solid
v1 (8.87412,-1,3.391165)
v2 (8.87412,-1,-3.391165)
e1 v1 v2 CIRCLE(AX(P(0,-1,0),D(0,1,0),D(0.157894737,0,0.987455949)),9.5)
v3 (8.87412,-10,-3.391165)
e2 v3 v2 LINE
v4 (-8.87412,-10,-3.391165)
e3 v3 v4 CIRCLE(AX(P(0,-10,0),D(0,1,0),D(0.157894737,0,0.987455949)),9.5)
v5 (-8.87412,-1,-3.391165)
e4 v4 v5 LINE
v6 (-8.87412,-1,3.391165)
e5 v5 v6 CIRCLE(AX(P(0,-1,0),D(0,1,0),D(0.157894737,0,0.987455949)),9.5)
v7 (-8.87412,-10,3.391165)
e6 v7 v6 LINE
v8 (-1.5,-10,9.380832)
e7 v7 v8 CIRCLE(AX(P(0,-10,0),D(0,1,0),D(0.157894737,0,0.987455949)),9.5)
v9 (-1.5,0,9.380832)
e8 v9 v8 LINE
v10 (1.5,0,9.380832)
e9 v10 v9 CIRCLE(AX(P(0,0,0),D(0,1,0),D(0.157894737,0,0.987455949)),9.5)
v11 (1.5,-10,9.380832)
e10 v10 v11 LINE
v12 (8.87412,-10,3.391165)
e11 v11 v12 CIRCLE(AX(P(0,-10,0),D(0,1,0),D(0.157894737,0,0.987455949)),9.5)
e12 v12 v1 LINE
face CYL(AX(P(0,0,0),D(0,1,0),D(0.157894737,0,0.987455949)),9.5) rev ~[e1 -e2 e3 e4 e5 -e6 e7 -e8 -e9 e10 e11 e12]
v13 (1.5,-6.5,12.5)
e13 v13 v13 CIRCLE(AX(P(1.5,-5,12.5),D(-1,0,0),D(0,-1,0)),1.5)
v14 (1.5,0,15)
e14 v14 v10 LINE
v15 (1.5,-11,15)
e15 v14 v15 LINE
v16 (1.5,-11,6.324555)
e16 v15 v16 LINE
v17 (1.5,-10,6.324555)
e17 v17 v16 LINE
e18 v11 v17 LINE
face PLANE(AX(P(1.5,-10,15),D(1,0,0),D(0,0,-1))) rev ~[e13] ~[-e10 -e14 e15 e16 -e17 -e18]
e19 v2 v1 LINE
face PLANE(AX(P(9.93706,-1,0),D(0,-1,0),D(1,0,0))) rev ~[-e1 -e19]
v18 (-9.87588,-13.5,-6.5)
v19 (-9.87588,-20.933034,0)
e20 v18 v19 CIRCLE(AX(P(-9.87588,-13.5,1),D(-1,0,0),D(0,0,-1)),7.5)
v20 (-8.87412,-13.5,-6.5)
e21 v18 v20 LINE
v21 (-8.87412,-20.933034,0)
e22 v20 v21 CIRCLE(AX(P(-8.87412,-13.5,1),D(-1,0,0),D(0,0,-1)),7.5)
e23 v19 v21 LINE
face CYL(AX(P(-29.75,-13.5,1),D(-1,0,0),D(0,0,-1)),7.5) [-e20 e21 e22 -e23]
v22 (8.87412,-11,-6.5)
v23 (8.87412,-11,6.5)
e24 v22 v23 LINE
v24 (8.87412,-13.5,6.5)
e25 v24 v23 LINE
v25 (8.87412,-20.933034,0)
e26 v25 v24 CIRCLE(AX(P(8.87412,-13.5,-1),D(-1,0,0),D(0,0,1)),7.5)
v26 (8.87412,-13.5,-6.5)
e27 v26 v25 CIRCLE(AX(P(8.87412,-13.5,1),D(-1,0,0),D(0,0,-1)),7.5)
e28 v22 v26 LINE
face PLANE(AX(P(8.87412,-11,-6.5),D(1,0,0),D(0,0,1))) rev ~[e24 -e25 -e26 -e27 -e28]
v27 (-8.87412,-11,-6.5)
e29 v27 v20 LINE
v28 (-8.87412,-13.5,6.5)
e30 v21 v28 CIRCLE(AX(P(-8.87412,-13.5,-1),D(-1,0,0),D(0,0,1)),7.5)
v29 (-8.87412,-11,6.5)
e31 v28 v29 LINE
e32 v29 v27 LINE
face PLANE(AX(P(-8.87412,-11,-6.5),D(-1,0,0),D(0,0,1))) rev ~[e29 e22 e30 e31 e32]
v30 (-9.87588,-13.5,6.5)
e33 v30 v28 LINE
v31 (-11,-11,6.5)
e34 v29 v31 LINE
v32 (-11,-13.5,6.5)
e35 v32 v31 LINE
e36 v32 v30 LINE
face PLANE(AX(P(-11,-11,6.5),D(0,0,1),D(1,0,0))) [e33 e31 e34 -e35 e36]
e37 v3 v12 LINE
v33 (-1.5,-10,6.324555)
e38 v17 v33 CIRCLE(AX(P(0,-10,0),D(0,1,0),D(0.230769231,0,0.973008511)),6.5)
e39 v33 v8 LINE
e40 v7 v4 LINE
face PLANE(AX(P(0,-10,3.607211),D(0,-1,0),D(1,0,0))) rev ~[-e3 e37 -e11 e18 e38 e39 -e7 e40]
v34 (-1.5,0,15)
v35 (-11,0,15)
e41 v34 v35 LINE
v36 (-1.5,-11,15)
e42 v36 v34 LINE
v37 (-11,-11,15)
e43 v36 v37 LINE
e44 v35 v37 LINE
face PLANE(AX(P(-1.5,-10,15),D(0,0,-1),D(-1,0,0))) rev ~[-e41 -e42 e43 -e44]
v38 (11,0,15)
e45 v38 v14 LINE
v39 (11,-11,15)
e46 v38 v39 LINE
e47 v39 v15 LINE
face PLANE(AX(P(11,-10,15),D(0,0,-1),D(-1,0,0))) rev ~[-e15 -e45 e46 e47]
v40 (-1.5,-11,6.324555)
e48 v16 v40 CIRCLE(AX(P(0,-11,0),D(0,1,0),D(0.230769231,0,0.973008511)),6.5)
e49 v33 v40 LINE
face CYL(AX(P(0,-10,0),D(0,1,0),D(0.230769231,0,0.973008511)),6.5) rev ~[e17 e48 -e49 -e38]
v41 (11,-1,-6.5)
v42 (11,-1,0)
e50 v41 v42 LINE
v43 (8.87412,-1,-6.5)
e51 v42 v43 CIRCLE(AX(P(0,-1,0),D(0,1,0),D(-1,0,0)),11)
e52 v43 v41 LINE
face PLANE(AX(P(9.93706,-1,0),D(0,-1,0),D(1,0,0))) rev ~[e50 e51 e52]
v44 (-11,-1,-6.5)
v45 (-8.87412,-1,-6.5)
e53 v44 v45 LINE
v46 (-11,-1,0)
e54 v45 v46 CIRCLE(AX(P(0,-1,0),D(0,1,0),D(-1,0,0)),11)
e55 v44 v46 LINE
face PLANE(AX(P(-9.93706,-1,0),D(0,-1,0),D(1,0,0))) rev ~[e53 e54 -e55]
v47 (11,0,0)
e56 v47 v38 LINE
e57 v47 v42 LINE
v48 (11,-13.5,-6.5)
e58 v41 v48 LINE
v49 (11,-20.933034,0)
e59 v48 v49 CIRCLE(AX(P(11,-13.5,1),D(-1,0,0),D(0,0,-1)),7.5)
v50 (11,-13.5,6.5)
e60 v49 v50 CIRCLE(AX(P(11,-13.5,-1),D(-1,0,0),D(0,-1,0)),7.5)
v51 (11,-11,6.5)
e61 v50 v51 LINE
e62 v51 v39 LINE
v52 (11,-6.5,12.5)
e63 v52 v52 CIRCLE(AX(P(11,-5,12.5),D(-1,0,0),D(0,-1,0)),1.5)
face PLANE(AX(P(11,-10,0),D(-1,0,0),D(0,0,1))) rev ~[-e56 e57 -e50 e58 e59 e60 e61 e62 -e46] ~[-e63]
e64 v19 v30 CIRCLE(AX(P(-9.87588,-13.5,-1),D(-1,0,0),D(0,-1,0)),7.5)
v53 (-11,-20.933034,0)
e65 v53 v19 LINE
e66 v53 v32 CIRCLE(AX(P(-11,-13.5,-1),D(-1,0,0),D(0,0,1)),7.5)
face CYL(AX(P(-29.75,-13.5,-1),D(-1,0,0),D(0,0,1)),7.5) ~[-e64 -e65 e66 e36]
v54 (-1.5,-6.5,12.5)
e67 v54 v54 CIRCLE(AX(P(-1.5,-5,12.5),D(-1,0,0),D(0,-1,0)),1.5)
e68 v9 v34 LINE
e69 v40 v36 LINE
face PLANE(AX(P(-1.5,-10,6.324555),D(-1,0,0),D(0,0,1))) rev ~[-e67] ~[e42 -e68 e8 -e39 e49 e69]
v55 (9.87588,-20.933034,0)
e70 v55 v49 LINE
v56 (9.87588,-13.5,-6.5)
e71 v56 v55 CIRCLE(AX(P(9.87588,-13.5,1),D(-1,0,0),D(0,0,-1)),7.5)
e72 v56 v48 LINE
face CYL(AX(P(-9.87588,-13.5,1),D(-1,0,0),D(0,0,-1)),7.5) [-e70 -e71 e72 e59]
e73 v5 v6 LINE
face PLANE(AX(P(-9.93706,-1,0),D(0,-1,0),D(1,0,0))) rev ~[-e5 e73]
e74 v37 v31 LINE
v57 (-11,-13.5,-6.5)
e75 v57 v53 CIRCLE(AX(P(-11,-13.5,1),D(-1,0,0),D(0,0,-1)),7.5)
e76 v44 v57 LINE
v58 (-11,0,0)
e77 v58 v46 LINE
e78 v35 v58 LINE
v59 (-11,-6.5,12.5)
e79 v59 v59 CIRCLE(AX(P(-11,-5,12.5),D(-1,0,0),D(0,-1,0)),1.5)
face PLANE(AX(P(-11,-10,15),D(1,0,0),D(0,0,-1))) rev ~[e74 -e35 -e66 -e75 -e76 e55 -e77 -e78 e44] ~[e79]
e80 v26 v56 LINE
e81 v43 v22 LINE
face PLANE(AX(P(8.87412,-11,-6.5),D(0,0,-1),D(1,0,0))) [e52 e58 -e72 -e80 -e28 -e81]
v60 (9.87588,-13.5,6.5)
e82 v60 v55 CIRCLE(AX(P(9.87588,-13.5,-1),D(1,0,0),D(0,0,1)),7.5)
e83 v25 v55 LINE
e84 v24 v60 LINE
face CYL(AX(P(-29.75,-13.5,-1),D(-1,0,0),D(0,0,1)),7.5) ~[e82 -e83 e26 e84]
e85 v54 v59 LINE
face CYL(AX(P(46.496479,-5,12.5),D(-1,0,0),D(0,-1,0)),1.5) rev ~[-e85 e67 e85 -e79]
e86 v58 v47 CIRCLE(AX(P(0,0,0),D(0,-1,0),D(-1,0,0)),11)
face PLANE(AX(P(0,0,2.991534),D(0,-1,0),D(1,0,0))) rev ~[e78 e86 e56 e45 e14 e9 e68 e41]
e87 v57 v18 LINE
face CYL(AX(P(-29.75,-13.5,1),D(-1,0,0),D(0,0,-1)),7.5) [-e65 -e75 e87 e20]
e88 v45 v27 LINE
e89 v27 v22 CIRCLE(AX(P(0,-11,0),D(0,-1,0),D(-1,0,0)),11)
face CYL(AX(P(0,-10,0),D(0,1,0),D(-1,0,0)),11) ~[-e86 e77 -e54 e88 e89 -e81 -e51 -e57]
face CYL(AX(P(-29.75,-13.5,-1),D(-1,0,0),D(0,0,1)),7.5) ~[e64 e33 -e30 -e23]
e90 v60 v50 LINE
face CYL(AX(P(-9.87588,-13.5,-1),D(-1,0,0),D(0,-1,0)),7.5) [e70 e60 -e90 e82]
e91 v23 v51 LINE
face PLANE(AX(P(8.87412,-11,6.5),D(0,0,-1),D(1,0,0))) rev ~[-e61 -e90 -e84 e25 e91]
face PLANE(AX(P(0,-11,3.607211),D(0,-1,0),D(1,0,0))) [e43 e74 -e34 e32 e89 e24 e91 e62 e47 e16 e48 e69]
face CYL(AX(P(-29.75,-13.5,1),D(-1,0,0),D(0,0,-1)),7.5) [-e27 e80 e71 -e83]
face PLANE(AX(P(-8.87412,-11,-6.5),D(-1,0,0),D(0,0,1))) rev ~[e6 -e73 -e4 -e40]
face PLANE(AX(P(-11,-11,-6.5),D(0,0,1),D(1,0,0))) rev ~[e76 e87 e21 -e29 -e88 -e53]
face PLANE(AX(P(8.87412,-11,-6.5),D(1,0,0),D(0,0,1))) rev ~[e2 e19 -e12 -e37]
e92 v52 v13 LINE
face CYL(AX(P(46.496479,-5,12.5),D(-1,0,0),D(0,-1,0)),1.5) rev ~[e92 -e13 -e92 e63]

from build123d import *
from build123d import SkipClean  # not in build123d's __all__

# Parameters (mm, degrees)
F1_DEPTH    = 10
F3_D        = 3
F5_DEPTH    = 1
F6_W        = 2.1258803254
F6_H        = 13
F7_DEPTH    = 10
F8_T1_DEPTH = 39.6258803254
F8_T3_DEPTH = 39.6258803254


# Not quite as in the source:
# - a fillet or chamfer that OpenCascade refuses, or shapes differently, is made with other operations: its cross-section is extruded or revolved along the edge and cut away or added


with BuildPart() as f1:
    # F0 (on Front) → F1 (new body)
    with BuildSketch(Plane.XZ):
        with BuildLine():
            ThreePointArc((1.5, 9.3808315196), (0, -9.5), (-1.5, 9.3808315196))
            Line((-1.5, 9.3808315196), (-1.5, 15))
            Line((-1.5, 15), (-11, 15))
            Line((-11, 15), (-11, 0))
            ThreePointArc((-11, 0), (0, -11), (11, 0))
            Line((11, 0), (11, 15))
            Line((11, 15), (1.5, 15))
            Line((1.5, 15), (1.5, 9.3808315196))
        make_face()
    extrude(amount=F1_DEPTH)

    # F3 (through all)
    with Locations(Plane.YZ.offset(11)):
        with Locations((-5, 12.5)):
            Hole(F3_D / 2)

    # F4 (on face) → F5 (join)
    with BuildSketch(Plane.XZ.offset(10)):
        with BuildLine():
            Line((-1.5, 15), (-11, 15))
            Line((-11, 15), (-11, 0))
            ThreePointArc((-11, 0), (0, -11), (11, 0))
            Line((11, 0), (11, 15))
            Line((11, 15), (1.5, 15))
            Line((1.5, 15), (1.5, 6.3245553203))
            ThreePointArc((1.5, 6.3245553203), (0, -6.5), (-1.5, 6.3245553203))
            Line((-1.5, 6.3245553203), (-1.5, 15))
        make_face()
    extrude(amount=F5_DEPTH)

    # F6 (on face) → F7 (join, symmetric)
    with BuildSketch(Plane.XZ.offset(11)):
        with Locations((-9.9370598373, 0)):
            Rectangle(F6_W, F6_H)
        with Locations((9.9370598373, 0)):
            Rectangle(F6_W, F6_H)
    extrude(amount=F7_DEPTH, both=True)

    # F8: fillet of radius 7.5 on 4 edges, made by hand

    # F8_s2 → F8_t1 (cut)
    with BuildSketch(Plane.YZ.offset(-29.75)):
        with BuildLine():
            ThreePointArc((-13.5, -6.5), (-18.8033008589, -4.3033008589), (-21, 1))
            Line((-21, 1), (-21, -6.5))
            Line((-21, -6.5), (-13.5, -6.5))
        make_face()
        with BuildLine():
            ThreePointArc((-13.5, 6.5), (-18.8033008589, 4.3033008589), (-21, -1))
            Line((-21, -1), (-21, 6.5))
            Line((-21, 6.5), (-13.5, 6.5))
        make_face()
    extrude(amount=F8_T1_DEPTH, mode=Mode.SUBTRACT)

    # F8_s4 → F8_t3 (cut)
    with BuildSketch(Plane.YZ.offset(-9.8758803254)):
        with BuildLine():
            ThreePointArc((-21, -1), (-18.8033008589, 4.3033008589), (-13.5, 6.5))
            Line((-13.5, 6.5), (-21, 6.5))
            Line((-21, 6.5), (-21, -1))
        make_face()
        with BuildLine():
            ThreePointArc((-13.5, -6.5), (-18.8033008589, -4.3033008589), (-21, 1))
            Line((-21, 1), (-21, -6.5))
            Line((-21, -6.5), (-13.5, -6.5))
        make_face()
    with SkipClean():  # cleaning this boolean's faces spoils the solid; the shape is the same uncleaned
        extrude(amount=F8_T3_DEPTH, mode=Mode.SUBTRACT)


solid = f1.part
